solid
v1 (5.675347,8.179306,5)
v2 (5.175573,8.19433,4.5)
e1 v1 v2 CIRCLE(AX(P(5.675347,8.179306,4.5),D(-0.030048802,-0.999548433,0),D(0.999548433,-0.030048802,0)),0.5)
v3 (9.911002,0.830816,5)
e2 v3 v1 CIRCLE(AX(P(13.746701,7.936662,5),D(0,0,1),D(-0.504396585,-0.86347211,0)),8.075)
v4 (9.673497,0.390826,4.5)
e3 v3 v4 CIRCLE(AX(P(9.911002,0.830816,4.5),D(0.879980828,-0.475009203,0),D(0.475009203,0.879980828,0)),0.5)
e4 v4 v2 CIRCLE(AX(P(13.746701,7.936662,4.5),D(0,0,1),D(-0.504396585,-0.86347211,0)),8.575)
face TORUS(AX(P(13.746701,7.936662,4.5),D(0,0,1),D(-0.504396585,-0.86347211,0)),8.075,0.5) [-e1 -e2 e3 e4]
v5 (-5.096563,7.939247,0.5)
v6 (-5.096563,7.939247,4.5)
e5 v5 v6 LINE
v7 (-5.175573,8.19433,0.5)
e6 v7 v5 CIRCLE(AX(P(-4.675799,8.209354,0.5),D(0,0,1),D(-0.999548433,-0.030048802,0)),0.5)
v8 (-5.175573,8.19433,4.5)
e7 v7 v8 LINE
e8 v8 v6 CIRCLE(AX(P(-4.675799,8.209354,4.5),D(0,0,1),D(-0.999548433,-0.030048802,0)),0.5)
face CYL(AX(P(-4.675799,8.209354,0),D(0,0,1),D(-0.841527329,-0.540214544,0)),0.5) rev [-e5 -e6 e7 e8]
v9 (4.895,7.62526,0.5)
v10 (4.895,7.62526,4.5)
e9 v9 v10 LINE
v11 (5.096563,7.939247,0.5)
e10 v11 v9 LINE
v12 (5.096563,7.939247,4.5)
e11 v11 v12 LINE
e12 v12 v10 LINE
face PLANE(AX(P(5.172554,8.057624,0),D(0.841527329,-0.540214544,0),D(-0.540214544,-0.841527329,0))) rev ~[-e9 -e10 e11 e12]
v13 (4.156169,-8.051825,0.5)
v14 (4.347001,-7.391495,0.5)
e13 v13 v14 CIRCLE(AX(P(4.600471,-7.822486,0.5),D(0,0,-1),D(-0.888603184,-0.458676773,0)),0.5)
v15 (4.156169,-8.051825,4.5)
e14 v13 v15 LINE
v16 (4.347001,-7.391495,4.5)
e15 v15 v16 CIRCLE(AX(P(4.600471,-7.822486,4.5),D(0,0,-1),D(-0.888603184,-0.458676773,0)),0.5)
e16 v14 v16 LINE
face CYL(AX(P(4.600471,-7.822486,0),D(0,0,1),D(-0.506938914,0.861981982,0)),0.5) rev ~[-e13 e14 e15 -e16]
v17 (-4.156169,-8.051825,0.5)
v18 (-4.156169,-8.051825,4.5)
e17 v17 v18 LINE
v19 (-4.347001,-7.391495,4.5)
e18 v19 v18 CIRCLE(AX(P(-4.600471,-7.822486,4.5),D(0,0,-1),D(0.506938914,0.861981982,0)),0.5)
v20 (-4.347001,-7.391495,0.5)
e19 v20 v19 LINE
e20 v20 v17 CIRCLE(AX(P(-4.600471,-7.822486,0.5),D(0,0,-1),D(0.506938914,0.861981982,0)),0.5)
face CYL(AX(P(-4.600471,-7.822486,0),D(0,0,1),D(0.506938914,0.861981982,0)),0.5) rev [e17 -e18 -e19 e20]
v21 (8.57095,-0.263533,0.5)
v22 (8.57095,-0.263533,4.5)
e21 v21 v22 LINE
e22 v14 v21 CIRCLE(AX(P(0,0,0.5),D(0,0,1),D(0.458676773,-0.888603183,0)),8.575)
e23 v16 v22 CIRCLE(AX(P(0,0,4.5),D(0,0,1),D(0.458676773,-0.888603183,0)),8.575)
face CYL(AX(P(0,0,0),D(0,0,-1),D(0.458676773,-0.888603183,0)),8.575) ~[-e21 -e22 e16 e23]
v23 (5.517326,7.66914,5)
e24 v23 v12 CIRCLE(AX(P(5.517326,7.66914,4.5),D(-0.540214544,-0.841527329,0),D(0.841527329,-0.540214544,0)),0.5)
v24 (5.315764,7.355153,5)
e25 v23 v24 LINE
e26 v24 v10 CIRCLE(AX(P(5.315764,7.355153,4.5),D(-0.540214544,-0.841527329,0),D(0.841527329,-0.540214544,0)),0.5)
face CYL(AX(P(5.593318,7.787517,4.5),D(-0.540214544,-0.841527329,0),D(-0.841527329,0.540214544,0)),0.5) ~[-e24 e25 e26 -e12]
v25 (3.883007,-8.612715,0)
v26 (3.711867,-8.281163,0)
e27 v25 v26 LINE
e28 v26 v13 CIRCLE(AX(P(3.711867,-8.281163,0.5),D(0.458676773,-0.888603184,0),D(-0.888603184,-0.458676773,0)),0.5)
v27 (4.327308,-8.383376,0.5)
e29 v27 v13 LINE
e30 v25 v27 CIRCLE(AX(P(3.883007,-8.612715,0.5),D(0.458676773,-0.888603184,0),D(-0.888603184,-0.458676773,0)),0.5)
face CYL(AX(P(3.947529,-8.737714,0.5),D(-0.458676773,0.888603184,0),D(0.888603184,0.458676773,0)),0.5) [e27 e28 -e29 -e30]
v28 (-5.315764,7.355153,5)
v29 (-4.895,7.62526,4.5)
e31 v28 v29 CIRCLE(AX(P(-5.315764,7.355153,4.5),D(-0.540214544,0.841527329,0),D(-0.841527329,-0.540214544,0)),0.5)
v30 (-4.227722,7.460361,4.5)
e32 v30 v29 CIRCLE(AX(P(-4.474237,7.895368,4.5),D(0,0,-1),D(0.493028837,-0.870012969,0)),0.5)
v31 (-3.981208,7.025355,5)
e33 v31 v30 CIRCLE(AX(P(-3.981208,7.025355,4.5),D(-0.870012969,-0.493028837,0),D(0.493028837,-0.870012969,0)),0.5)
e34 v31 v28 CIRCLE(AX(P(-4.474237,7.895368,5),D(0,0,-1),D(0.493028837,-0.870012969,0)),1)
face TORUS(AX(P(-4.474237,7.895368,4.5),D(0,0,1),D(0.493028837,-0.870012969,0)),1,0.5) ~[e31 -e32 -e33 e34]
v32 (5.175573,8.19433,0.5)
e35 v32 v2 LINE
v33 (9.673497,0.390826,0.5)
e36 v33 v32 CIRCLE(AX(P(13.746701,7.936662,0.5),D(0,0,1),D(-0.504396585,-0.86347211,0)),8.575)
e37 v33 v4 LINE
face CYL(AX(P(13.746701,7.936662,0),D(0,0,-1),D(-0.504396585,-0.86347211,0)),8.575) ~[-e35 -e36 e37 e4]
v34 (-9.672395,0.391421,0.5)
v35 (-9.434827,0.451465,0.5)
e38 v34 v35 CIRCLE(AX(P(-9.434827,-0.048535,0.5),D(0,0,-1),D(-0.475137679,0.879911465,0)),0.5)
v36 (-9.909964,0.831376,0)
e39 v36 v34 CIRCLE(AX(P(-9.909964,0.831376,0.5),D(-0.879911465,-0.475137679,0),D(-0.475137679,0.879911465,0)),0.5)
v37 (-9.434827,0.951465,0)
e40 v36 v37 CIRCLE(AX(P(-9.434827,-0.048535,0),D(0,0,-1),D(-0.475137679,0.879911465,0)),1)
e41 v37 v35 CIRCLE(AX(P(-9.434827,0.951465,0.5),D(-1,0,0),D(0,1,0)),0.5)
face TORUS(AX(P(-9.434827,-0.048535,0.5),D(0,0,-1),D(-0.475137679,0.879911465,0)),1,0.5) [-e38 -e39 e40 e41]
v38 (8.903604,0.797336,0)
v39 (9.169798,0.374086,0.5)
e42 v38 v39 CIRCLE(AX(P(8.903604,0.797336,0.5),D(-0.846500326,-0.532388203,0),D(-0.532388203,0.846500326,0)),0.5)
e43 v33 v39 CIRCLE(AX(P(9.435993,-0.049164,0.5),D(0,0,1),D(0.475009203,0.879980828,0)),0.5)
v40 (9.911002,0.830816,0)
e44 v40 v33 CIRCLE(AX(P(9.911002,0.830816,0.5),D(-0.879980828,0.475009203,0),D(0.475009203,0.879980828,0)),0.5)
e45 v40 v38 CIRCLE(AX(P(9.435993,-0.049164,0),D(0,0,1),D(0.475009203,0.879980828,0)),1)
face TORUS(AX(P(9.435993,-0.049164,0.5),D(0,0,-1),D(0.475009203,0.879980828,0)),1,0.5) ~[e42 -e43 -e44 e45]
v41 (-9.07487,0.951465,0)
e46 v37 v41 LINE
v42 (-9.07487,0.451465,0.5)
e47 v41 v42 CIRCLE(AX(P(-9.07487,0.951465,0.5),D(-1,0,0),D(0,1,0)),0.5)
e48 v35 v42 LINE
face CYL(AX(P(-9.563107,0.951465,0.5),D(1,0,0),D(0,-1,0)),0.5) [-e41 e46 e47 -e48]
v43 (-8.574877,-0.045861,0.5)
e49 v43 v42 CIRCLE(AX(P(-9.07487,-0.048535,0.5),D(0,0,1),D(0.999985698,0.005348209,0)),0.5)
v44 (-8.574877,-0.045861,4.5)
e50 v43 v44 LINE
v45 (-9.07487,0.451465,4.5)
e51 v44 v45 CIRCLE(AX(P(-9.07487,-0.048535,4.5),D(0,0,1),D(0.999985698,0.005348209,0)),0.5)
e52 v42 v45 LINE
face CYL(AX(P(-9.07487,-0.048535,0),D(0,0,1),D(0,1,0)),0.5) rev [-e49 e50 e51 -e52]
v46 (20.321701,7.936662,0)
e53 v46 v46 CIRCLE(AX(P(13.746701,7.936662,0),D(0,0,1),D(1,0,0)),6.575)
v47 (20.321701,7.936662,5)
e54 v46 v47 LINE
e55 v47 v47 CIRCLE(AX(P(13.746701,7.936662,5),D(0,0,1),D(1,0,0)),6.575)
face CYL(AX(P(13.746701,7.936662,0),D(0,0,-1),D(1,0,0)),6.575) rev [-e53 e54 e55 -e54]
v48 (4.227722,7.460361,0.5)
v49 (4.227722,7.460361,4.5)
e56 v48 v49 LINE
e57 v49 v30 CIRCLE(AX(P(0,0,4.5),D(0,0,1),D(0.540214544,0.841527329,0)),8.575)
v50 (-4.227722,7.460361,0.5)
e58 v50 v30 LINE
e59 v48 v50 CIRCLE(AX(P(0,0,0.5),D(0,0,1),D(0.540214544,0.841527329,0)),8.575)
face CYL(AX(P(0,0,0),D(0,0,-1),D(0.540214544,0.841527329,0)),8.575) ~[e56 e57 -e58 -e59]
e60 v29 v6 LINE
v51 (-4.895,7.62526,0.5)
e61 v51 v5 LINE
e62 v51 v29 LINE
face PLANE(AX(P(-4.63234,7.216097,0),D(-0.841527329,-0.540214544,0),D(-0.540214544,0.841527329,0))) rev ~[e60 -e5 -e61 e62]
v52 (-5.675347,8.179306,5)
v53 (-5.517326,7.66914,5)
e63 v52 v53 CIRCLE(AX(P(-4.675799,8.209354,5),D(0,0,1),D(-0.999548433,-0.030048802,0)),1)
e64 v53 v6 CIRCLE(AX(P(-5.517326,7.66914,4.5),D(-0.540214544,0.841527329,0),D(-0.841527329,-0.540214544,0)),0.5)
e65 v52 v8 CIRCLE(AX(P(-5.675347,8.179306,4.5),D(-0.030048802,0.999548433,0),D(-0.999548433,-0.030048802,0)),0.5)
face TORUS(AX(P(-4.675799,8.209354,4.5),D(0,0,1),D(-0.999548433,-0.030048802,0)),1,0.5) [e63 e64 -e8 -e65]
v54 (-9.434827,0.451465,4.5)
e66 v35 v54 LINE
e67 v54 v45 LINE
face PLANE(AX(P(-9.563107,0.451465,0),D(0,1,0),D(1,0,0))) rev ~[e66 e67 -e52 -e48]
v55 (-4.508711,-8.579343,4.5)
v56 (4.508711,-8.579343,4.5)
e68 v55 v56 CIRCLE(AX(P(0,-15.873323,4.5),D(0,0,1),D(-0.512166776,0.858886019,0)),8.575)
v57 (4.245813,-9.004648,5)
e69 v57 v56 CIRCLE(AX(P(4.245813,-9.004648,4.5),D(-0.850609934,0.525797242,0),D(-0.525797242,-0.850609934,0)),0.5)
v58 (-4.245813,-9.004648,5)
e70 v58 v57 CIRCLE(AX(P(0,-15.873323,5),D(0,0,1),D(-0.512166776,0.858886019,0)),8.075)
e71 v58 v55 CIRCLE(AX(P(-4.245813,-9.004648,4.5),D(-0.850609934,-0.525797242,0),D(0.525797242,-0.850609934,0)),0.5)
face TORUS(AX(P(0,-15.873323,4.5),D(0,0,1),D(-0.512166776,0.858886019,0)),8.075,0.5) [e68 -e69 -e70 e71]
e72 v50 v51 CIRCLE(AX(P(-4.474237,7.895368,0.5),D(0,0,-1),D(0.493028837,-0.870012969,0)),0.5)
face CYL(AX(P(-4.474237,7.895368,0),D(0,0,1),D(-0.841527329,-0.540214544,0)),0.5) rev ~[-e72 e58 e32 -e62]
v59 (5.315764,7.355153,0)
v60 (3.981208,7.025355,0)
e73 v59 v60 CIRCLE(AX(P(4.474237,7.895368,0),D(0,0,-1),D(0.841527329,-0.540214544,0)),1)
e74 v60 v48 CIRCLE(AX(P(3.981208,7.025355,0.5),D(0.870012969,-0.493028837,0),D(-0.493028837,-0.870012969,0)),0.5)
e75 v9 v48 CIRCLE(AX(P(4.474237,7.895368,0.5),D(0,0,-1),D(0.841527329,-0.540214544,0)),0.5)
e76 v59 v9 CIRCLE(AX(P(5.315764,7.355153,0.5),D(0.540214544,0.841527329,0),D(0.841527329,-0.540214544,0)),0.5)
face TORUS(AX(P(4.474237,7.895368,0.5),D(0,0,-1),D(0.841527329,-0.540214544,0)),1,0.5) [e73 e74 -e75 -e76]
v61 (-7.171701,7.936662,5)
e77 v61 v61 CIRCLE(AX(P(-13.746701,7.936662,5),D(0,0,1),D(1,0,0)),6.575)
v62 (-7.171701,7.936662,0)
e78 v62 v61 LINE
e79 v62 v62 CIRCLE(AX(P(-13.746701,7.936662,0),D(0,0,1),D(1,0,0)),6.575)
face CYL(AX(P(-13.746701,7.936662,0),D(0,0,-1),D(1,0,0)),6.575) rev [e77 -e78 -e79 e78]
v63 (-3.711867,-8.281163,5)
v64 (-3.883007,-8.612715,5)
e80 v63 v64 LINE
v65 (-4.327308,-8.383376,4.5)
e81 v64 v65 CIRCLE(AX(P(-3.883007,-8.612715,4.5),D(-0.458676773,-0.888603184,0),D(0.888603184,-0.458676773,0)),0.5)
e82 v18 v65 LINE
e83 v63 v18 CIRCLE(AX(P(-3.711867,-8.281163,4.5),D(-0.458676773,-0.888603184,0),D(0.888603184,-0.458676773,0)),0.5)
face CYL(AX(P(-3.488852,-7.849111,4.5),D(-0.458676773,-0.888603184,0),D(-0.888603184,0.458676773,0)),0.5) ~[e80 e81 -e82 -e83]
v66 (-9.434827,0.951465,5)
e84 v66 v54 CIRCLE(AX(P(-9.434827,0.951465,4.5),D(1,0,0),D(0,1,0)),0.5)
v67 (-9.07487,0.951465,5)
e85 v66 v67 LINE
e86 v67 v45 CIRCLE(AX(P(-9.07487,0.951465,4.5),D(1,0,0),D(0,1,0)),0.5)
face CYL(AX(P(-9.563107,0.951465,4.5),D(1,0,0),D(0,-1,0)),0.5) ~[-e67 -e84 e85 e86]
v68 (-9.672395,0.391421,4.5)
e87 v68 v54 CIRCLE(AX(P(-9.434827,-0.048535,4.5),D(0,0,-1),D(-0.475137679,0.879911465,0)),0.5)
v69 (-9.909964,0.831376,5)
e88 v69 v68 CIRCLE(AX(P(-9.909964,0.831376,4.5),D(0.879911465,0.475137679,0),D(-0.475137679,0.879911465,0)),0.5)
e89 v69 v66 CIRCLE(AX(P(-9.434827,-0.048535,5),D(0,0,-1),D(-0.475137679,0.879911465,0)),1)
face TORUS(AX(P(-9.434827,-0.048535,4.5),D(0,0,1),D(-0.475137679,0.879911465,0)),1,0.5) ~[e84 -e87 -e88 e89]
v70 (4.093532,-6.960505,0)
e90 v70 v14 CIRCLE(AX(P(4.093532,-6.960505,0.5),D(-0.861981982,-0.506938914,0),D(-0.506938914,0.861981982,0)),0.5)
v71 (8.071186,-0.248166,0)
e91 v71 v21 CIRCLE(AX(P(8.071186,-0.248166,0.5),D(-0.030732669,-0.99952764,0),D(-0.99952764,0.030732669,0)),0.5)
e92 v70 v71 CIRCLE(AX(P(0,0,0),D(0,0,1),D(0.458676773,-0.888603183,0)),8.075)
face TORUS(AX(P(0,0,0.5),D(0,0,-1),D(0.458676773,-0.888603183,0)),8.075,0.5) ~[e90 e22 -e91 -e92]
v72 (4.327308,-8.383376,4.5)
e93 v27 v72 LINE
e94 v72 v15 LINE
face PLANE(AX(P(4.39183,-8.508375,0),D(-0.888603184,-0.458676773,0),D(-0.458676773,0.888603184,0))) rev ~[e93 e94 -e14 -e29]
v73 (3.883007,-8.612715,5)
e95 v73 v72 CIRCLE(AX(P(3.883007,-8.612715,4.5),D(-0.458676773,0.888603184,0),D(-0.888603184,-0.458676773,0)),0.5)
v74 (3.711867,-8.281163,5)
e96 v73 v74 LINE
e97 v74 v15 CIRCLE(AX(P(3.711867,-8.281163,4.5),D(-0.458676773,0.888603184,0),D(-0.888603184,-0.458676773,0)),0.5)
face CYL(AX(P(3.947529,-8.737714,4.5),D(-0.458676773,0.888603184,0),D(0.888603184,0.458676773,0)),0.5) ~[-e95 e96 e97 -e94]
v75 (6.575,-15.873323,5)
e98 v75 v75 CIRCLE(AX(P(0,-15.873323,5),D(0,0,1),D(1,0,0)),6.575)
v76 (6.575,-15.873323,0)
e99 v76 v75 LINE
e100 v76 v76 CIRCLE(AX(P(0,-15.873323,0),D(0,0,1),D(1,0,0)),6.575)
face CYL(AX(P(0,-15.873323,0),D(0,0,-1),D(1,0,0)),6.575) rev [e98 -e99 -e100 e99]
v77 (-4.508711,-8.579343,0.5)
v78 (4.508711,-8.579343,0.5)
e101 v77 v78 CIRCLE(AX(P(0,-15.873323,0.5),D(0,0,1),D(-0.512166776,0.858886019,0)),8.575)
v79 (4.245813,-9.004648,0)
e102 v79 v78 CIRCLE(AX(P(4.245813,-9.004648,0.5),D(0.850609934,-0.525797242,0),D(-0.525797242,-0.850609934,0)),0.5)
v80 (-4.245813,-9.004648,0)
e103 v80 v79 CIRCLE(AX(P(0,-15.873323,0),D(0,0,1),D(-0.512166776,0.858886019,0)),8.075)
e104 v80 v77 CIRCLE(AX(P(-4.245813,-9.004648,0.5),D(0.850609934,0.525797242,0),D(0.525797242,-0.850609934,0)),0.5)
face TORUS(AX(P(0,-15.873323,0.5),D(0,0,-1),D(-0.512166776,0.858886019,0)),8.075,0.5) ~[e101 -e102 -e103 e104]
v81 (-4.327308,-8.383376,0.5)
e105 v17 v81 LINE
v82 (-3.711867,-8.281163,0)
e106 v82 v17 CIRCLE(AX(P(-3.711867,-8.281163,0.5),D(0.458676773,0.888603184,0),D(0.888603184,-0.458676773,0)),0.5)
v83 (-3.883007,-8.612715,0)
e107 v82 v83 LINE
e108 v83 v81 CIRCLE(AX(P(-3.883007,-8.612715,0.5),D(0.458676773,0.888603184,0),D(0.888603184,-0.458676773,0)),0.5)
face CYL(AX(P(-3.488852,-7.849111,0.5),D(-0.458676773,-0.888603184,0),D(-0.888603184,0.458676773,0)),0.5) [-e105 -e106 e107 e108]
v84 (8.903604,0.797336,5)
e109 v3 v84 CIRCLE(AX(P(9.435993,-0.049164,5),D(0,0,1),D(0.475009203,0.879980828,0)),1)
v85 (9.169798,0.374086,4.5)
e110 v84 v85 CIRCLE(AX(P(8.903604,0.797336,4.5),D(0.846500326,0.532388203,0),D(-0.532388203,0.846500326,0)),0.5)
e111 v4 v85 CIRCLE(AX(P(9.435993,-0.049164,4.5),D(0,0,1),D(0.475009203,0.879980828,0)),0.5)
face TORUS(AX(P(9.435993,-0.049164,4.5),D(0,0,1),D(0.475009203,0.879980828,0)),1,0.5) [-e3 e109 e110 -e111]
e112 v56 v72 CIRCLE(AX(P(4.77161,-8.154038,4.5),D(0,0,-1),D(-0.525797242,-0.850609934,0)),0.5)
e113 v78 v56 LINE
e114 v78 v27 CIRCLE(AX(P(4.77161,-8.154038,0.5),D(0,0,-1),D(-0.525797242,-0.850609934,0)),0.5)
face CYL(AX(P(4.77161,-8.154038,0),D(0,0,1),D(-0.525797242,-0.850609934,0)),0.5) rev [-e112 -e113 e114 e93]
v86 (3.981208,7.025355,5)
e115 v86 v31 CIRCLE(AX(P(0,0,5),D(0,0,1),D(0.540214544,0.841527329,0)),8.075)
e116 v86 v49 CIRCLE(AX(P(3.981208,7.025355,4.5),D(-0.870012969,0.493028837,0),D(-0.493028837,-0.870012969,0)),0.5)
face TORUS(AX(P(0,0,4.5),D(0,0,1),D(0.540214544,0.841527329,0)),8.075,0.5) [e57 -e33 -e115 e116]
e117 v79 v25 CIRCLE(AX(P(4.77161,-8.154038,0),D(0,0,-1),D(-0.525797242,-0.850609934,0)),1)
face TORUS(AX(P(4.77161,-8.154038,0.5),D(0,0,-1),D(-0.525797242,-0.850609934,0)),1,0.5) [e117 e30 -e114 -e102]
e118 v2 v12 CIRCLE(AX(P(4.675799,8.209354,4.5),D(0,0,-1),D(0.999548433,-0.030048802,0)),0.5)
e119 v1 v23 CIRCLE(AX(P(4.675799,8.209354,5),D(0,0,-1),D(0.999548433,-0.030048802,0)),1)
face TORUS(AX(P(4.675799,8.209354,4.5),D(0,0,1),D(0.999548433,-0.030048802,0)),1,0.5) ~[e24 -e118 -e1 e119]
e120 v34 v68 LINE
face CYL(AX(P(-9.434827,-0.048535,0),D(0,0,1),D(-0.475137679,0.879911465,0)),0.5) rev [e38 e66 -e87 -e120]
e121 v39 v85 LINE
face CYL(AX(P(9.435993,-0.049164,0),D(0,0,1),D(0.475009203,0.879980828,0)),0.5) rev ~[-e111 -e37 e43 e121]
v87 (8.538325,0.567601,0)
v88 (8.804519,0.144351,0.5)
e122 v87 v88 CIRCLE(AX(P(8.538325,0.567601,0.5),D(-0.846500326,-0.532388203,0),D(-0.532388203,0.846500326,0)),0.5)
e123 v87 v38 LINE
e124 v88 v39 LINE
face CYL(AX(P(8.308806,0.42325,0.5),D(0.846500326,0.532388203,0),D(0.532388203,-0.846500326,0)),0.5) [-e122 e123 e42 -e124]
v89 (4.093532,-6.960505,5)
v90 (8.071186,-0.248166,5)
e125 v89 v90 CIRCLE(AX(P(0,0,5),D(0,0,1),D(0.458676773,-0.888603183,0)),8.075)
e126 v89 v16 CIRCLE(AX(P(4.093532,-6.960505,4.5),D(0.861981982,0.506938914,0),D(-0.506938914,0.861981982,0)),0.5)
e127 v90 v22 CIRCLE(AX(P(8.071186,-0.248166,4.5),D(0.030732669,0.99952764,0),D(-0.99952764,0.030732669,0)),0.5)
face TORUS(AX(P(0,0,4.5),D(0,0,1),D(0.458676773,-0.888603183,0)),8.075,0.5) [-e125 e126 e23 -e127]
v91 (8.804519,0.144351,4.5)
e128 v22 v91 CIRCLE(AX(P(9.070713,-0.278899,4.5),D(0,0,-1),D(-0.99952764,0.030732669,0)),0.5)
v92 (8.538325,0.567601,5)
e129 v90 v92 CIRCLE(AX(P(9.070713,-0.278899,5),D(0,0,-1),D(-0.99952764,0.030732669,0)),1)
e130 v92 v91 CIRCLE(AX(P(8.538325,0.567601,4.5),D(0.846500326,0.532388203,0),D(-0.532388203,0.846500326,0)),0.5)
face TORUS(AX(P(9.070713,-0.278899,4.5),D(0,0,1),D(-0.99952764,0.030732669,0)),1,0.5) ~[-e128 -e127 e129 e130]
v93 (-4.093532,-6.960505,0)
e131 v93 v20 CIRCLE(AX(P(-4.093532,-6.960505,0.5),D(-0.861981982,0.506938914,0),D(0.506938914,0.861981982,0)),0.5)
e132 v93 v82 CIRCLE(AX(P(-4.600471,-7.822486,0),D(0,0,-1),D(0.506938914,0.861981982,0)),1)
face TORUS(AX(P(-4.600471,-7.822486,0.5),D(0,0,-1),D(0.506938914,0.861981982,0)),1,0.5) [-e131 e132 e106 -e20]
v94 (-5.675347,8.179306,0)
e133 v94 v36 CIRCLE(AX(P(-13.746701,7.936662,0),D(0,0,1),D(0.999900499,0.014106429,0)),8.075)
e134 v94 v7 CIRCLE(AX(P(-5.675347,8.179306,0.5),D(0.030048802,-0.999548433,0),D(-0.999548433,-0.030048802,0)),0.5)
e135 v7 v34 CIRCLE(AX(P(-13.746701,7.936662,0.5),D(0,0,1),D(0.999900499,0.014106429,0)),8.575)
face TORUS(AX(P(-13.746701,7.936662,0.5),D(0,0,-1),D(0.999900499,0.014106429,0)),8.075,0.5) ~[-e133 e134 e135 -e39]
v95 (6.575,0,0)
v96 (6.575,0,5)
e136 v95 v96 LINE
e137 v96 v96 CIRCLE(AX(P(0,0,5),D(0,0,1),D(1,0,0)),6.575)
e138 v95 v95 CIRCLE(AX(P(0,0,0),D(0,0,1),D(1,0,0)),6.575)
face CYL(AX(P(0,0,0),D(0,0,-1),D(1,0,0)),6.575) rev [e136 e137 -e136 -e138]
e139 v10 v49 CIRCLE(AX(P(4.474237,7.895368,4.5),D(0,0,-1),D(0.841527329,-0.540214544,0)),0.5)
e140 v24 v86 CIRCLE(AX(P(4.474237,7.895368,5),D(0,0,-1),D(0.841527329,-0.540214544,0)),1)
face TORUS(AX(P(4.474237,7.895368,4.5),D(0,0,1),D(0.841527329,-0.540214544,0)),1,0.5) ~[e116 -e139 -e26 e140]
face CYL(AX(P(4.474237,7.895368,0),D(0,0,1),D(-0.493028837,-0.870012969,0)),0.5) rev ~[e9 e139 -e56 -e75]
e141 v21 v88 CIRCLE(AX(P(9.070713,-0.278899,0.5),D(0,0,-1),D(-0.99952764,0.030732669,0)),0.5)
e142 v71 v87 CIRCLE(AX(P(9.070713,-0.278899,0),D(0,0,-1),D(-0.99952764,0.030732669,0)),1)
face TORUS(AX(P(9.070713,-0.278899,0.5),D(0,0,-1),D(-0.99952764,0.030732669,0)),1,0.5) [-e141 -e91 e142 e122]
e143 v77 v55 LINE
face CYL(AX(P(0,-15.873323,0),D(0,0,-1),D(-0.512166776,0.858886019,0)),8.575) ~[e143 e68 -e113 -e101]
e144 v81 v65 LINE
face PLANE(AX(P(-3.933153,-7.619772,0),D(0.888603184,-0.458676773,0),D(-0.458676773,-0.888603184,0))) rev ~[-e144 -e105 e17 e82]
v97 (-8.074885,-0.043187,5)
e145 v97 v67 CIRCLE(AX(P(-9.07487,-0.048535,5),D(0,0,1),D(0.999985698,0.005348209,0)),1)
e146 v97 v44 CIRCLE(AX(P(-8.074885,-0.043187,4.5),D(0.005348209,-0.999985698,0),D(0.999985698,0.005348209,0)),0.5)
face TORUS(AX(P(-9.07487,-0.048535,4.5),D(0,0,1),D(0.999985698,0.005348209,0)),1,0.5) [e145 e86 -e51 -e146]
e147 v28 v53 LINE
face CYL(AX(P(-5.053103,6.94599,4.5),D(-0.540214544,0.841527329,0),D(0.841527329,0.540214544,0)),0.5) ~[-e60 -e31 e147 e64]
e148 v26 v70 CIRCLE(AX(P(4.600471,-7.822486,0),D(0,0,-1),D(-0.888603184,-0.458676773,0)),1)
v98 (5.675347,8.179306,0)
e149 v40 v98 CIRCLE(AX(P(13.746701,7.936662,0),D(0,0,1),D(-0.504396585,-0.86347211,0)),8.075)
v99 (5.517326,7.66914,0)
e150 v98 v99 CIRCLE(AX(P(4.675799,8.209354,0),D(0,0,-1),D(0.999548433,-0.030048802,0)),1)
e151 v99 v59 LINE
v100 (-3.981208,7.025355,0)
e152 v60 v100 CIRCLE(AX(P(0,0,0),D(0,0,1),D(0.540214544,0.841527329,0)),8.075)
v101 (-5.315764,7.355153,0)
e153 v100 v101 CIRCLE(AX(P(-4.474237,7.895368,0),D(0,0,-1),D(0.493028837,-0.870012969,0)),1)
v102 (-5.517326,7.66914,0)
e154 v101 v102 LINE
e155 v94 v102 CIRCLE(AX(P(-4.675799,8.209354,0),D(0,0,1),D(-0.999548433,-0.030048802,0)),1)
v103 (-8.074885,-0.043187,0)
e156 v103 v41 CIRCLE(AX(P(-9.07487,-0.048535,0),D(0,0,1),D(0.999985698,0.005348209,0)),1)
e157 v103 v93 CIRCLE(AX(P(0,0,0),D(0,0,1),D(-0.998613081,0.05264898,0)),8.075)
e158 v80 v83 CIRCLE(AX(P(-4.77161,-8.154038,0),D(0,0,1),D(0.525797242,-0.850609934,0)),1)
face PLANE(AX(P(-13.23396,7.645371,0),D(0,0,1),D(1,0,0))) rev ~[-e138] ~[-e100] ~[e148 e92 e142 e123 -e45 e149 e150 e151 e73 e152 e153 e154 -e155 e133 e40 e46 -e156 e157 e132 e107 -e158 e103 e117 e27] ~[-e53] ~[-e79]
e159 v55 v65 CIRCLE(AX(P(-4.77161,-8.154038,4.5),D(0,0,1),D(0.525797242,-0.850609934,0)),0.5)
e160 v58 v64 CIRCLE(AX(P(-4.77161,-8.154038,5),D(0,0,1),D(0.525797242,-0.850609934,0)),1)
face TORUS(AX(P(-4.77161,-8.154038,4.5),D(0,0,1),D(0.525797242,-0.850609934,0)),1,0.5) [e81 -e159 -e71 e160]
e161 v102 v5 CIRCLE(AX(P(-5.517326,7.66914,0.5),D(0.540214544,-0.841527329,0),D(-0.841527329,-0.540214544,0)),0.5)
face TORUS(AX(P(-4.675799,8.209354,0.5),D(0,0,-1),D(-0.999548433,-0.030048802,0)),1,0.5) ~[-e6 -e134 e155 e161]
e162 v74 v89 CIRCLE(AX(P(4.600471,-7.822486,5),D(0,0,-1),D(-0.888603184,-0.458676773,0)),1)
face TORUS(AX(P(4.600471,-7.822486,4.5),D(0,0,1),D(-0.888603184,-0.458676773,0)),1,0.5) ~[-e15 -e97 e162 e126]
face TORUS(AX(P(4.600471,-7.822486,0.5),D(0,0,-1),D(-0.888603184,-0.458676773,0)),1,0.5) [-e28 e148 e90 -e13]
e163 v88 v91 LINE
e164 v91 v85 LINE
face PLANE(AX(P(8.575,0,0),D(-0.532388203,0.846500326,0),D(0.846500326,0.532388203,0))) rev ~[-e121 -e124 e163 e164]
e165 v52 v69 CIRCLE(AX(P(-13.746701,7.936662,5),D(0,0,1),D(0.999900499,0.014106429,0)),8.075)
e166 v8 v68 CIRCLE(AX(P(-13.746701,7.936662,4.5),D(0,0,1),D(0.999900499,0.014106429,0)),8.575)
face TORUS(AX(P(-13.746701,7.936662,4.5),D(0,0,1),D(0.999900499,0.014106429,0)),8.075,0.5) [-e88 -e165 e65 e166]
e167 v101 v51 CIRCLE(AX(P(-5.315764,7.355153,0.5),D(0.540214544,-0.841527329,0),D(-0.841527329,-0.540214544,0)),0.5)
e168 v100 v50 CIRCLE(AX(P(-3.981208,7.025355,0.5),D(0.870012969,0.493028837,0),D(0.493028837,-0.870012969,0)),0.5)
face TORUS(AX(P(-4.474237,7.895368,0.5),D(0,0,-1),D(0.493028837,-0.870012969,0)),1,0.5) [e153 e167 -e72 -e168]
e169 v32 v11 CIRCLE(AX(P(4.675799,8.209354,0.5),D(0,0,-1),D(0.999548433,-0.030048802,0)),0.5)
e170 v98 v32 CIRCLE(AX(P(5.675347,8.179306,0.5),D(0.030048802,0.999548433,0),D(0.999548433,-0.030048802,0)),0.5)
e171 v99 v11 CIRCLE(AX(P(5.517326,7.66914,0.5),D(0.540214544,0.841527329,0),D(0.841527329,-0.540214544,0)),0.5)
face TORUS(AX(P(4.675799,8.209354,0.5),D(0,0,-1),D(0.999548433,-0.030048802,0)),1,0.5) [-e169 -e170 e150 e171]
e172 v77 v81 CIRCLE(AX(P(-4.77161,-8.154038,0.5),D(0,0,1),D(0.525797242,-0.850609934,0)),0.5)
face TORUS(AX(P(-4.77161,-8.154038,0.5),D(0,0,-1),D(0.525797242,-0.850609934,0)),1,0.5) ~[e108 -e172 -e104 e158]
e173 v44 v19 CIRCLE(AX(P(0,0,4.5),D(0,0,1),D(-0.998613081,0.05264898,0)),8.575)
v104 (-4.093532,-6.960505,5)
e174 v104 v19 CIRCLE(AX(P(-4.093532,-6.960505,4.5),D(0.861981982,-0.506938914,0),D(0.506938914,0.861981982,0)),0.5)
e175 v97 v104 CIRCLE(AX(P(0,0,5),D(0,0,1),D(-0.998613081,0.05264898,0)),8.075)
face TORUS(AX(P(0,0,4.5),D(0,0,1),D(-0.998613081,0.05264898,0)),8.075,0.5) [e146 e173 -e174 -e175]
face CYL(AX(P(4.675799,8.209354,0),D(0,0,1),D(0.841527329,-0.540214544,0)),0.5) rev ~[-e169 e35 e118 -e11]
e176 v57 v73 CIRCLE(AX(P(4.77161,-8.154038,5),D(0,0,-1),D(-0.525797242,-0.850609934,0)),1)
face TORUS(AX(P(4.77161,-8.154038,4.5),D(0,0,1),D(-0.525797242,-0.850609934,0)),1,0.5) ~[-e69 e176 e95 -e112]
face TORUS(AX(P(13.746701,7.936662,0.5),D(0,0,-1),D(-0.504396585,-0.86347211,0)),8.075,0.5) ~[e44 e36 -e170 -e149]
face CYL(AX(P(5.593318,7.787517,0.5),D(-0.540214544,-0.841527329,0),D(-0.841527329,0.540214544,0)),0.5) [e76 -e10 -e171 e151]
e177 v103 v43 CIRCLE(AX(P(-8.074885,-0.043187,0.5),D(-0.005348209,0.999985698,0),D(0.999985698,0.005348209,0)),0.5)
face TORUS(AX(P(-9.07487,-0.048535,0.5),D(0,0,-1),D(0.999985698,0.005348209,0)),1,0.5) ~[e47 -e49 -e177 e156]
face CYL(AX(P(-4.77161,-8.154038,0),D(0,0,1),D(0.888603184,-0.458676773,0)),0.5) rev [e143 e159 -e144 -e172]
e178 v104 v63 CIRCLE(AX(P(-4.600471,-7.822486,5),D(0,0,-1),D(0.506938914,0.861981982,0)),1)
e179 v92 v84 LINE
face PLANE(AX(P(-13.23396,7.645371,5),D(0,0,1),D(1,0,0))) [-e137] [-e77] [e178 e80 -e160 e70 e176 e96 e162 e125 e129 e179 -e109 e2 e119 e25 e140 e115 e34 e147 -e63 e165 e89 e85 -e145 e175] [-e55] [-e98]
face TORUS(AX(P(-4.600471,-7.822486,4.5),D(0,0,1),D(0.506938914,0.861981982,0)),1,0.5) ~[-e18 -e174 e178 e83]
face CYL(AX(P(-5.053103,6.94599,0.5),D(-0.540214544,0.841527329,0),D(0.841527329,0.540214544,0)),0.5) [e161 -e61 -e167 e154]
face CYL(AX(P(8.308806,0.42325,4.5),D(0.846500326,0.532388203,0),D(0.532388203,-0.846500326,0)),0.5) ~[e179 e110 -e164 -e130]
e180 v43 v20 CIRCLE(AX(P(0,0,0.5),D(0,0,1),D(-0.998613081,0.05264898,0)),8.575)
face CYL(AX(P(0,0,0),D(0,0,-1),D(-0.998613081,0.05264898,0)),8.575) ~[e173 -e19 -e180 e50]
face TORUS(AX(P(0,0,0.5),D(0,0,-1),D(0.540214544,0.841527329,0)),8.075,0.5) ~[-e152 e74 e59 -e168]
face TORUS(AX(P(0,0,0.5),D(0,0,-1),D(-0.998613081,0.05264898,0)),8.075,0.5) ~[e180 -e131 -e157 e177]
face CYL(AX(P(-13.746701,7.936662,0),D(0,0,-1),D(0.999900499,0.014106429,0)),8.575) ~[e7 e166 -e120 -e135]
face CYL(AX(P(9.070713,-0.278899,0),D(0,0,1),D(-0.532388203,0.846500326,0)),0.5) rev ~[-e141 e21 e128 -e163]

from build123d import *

# Parameters (mm, degrees)
F1_R     = 6.575
F2_DEPTH = 5
F3_R     = 0.5


with BuildPart() as f2:
    # F1 (on Top) → F2 (new body)
    with BuildSketch(Plane.XY):
        with BuildLine():
            Line((-4.6323397162, 7.2160968503), (-5.1725542604, 8.0576241798))
            ThreePointArc((-5.1725542604, 8.0576241798), (-21.1732346231, 12.2235279993), (-9.5631071668, 0.4514650047))
            Line((-9.5631071668, 0.4514650047), (-8.5631071668, 0.4514650047))
            ThreePointArc((-8.5631071668, 0.4514650047), (-7.4141766645, 4.3082025704), (-4.6323397162, 7.2160968503))
        make_face()
        with Locations((-13.7467010425, 7.9366615474)):
            Circle(F1_R, mode=Mode.SUBTRACT)
        with BuildLine():
            Line((5.1725542604, 8.0576241798), (4.6323397162, 7.2160968503))
            ThreePointArc((4.6323397162, 7.2160968503), (7.5250560817, 4.111466401), (8.575, 0))
            Line((8.575, 0), (9.4215003257, 0.5323882029))
            ThreePointArc((9.4215003257, 0.5323882029), (21.2136673342, 12.1527070165), (5.1725542604, 8.0576241798))
        make_face()
        with Locations((13.7467010425, 7.9366615474)):
            Circle(F1_R, mode=Mode.SUBTRACT)
        with BuildLine():
            ThreePointArc((3.9331533305, -7.6197722984), (0, -8.575), (-3.9331533305, -7.6197722984))
            Line((-3.9331533305, -7.6197722984), (-4.3918301037, -8.5083754819))
            ThreePointArc((-4.3918301037, -8.5083754819), (0, -24.4483230947), (4.3918301037, -8.5083754819))
            Line((4.3918301037, -8.5083754819), (3.9331533305, -7.6197722984))
        make_face()
        with Locations((0, -15.8733230947)):
            Circle(F1_R, mode=Mode.SUBTRACT)
        with BuildLine():
            ThreePointArc((4.6323397162, 7.2160968503), (0, 8.575), (-4.6323397162, 7.2160968503))
            ThreePointArc((-4.6323397162, 7.2160968503), (-7.4141766645, 4.3082025704), (-8.5631071668, 0.4514650047))
            ThreePointArc((-8.5631071668, 0.4514650047), (-7.4381012029, -4.2667640544), (-3.9331533305, -7.6197722984))
            ThreePointArc((-3.9331533305, -7.6197722984), (0, -8.575), (3.9331533305, -7.6197722984))
            ThreePointArc((3.9331533305, -7.6197722984), (7.323162391, -4.4611565312), (8.575, 0))
            ThreePointArc((8.575, 0), (7.5250560817, 4.111466401), (4.6323397162, 7.2160968503))
        make_face()
        Circle(F1_R, mode=Mode.SUBTRACT)
    extrude(amount=F2_DEPTH)

    # F3
    f3_edges = [f2.edges().sort_by_distance(p)[0] for p in [
        (-5.172554, 8.057624, 2.5),
        (-9.563107, 0.451465, 2.5),
        (-21.173235, 12.223528, 0),
        (-21.173235, 12.223528, 5),
        (-8.563107, 0.451465, 2.5),
        (-3.933153, -7.619772, 2.5),
        (-7.438101, -4.266764, 0),
        (-7.438101, -4.266764, 5),
        (-4.39183, -8.508375, 2.5),
        (4.39183, -8.508375, 2.5),
        (0, -24.448323, 0),
        (0, -24.448323, 5),
        (-9.063107, 0.451465, 0),
        (-9.063107, 0.451465, 5),
        (-4.162492, -8.064074, 0),
        (-4.162492, -8.064074, 5),
        (3.933153, -7.619772, 2.5),
        (4.162492, -8.064074, 0),
        (4.162492, -8.064074, 5),
        (8.575, 0, 2.5),
        (7.323162, -4.461157, 0),
        (7.323162, -4.461157, 5),
        (9.4215, 0.532388, 2.5),
        (5.172554, 8.057624, 2.5),
        (21.213667, 12.152707, 0),
        (21.213667, 12.152707, 5),
        (4.63234, 7.216097, 2.5),
        (4.902447, 7.636861, 0),
        (4.902447, 7.636861, 5),
        (-4.63234, 7.216097, 2.5),
        (0, 8.575, 0),
        (0, 8.575, 5),
        (-4.902447, 7.636861, 0),
        (-4.902447, 7.636861, 5),
        (8.99825, 0.266194, 0),
        (8.99825, 0.266194, 5),
    ]]
    fillet(f3_edges, radius=F3_R)


solid = f2.part
